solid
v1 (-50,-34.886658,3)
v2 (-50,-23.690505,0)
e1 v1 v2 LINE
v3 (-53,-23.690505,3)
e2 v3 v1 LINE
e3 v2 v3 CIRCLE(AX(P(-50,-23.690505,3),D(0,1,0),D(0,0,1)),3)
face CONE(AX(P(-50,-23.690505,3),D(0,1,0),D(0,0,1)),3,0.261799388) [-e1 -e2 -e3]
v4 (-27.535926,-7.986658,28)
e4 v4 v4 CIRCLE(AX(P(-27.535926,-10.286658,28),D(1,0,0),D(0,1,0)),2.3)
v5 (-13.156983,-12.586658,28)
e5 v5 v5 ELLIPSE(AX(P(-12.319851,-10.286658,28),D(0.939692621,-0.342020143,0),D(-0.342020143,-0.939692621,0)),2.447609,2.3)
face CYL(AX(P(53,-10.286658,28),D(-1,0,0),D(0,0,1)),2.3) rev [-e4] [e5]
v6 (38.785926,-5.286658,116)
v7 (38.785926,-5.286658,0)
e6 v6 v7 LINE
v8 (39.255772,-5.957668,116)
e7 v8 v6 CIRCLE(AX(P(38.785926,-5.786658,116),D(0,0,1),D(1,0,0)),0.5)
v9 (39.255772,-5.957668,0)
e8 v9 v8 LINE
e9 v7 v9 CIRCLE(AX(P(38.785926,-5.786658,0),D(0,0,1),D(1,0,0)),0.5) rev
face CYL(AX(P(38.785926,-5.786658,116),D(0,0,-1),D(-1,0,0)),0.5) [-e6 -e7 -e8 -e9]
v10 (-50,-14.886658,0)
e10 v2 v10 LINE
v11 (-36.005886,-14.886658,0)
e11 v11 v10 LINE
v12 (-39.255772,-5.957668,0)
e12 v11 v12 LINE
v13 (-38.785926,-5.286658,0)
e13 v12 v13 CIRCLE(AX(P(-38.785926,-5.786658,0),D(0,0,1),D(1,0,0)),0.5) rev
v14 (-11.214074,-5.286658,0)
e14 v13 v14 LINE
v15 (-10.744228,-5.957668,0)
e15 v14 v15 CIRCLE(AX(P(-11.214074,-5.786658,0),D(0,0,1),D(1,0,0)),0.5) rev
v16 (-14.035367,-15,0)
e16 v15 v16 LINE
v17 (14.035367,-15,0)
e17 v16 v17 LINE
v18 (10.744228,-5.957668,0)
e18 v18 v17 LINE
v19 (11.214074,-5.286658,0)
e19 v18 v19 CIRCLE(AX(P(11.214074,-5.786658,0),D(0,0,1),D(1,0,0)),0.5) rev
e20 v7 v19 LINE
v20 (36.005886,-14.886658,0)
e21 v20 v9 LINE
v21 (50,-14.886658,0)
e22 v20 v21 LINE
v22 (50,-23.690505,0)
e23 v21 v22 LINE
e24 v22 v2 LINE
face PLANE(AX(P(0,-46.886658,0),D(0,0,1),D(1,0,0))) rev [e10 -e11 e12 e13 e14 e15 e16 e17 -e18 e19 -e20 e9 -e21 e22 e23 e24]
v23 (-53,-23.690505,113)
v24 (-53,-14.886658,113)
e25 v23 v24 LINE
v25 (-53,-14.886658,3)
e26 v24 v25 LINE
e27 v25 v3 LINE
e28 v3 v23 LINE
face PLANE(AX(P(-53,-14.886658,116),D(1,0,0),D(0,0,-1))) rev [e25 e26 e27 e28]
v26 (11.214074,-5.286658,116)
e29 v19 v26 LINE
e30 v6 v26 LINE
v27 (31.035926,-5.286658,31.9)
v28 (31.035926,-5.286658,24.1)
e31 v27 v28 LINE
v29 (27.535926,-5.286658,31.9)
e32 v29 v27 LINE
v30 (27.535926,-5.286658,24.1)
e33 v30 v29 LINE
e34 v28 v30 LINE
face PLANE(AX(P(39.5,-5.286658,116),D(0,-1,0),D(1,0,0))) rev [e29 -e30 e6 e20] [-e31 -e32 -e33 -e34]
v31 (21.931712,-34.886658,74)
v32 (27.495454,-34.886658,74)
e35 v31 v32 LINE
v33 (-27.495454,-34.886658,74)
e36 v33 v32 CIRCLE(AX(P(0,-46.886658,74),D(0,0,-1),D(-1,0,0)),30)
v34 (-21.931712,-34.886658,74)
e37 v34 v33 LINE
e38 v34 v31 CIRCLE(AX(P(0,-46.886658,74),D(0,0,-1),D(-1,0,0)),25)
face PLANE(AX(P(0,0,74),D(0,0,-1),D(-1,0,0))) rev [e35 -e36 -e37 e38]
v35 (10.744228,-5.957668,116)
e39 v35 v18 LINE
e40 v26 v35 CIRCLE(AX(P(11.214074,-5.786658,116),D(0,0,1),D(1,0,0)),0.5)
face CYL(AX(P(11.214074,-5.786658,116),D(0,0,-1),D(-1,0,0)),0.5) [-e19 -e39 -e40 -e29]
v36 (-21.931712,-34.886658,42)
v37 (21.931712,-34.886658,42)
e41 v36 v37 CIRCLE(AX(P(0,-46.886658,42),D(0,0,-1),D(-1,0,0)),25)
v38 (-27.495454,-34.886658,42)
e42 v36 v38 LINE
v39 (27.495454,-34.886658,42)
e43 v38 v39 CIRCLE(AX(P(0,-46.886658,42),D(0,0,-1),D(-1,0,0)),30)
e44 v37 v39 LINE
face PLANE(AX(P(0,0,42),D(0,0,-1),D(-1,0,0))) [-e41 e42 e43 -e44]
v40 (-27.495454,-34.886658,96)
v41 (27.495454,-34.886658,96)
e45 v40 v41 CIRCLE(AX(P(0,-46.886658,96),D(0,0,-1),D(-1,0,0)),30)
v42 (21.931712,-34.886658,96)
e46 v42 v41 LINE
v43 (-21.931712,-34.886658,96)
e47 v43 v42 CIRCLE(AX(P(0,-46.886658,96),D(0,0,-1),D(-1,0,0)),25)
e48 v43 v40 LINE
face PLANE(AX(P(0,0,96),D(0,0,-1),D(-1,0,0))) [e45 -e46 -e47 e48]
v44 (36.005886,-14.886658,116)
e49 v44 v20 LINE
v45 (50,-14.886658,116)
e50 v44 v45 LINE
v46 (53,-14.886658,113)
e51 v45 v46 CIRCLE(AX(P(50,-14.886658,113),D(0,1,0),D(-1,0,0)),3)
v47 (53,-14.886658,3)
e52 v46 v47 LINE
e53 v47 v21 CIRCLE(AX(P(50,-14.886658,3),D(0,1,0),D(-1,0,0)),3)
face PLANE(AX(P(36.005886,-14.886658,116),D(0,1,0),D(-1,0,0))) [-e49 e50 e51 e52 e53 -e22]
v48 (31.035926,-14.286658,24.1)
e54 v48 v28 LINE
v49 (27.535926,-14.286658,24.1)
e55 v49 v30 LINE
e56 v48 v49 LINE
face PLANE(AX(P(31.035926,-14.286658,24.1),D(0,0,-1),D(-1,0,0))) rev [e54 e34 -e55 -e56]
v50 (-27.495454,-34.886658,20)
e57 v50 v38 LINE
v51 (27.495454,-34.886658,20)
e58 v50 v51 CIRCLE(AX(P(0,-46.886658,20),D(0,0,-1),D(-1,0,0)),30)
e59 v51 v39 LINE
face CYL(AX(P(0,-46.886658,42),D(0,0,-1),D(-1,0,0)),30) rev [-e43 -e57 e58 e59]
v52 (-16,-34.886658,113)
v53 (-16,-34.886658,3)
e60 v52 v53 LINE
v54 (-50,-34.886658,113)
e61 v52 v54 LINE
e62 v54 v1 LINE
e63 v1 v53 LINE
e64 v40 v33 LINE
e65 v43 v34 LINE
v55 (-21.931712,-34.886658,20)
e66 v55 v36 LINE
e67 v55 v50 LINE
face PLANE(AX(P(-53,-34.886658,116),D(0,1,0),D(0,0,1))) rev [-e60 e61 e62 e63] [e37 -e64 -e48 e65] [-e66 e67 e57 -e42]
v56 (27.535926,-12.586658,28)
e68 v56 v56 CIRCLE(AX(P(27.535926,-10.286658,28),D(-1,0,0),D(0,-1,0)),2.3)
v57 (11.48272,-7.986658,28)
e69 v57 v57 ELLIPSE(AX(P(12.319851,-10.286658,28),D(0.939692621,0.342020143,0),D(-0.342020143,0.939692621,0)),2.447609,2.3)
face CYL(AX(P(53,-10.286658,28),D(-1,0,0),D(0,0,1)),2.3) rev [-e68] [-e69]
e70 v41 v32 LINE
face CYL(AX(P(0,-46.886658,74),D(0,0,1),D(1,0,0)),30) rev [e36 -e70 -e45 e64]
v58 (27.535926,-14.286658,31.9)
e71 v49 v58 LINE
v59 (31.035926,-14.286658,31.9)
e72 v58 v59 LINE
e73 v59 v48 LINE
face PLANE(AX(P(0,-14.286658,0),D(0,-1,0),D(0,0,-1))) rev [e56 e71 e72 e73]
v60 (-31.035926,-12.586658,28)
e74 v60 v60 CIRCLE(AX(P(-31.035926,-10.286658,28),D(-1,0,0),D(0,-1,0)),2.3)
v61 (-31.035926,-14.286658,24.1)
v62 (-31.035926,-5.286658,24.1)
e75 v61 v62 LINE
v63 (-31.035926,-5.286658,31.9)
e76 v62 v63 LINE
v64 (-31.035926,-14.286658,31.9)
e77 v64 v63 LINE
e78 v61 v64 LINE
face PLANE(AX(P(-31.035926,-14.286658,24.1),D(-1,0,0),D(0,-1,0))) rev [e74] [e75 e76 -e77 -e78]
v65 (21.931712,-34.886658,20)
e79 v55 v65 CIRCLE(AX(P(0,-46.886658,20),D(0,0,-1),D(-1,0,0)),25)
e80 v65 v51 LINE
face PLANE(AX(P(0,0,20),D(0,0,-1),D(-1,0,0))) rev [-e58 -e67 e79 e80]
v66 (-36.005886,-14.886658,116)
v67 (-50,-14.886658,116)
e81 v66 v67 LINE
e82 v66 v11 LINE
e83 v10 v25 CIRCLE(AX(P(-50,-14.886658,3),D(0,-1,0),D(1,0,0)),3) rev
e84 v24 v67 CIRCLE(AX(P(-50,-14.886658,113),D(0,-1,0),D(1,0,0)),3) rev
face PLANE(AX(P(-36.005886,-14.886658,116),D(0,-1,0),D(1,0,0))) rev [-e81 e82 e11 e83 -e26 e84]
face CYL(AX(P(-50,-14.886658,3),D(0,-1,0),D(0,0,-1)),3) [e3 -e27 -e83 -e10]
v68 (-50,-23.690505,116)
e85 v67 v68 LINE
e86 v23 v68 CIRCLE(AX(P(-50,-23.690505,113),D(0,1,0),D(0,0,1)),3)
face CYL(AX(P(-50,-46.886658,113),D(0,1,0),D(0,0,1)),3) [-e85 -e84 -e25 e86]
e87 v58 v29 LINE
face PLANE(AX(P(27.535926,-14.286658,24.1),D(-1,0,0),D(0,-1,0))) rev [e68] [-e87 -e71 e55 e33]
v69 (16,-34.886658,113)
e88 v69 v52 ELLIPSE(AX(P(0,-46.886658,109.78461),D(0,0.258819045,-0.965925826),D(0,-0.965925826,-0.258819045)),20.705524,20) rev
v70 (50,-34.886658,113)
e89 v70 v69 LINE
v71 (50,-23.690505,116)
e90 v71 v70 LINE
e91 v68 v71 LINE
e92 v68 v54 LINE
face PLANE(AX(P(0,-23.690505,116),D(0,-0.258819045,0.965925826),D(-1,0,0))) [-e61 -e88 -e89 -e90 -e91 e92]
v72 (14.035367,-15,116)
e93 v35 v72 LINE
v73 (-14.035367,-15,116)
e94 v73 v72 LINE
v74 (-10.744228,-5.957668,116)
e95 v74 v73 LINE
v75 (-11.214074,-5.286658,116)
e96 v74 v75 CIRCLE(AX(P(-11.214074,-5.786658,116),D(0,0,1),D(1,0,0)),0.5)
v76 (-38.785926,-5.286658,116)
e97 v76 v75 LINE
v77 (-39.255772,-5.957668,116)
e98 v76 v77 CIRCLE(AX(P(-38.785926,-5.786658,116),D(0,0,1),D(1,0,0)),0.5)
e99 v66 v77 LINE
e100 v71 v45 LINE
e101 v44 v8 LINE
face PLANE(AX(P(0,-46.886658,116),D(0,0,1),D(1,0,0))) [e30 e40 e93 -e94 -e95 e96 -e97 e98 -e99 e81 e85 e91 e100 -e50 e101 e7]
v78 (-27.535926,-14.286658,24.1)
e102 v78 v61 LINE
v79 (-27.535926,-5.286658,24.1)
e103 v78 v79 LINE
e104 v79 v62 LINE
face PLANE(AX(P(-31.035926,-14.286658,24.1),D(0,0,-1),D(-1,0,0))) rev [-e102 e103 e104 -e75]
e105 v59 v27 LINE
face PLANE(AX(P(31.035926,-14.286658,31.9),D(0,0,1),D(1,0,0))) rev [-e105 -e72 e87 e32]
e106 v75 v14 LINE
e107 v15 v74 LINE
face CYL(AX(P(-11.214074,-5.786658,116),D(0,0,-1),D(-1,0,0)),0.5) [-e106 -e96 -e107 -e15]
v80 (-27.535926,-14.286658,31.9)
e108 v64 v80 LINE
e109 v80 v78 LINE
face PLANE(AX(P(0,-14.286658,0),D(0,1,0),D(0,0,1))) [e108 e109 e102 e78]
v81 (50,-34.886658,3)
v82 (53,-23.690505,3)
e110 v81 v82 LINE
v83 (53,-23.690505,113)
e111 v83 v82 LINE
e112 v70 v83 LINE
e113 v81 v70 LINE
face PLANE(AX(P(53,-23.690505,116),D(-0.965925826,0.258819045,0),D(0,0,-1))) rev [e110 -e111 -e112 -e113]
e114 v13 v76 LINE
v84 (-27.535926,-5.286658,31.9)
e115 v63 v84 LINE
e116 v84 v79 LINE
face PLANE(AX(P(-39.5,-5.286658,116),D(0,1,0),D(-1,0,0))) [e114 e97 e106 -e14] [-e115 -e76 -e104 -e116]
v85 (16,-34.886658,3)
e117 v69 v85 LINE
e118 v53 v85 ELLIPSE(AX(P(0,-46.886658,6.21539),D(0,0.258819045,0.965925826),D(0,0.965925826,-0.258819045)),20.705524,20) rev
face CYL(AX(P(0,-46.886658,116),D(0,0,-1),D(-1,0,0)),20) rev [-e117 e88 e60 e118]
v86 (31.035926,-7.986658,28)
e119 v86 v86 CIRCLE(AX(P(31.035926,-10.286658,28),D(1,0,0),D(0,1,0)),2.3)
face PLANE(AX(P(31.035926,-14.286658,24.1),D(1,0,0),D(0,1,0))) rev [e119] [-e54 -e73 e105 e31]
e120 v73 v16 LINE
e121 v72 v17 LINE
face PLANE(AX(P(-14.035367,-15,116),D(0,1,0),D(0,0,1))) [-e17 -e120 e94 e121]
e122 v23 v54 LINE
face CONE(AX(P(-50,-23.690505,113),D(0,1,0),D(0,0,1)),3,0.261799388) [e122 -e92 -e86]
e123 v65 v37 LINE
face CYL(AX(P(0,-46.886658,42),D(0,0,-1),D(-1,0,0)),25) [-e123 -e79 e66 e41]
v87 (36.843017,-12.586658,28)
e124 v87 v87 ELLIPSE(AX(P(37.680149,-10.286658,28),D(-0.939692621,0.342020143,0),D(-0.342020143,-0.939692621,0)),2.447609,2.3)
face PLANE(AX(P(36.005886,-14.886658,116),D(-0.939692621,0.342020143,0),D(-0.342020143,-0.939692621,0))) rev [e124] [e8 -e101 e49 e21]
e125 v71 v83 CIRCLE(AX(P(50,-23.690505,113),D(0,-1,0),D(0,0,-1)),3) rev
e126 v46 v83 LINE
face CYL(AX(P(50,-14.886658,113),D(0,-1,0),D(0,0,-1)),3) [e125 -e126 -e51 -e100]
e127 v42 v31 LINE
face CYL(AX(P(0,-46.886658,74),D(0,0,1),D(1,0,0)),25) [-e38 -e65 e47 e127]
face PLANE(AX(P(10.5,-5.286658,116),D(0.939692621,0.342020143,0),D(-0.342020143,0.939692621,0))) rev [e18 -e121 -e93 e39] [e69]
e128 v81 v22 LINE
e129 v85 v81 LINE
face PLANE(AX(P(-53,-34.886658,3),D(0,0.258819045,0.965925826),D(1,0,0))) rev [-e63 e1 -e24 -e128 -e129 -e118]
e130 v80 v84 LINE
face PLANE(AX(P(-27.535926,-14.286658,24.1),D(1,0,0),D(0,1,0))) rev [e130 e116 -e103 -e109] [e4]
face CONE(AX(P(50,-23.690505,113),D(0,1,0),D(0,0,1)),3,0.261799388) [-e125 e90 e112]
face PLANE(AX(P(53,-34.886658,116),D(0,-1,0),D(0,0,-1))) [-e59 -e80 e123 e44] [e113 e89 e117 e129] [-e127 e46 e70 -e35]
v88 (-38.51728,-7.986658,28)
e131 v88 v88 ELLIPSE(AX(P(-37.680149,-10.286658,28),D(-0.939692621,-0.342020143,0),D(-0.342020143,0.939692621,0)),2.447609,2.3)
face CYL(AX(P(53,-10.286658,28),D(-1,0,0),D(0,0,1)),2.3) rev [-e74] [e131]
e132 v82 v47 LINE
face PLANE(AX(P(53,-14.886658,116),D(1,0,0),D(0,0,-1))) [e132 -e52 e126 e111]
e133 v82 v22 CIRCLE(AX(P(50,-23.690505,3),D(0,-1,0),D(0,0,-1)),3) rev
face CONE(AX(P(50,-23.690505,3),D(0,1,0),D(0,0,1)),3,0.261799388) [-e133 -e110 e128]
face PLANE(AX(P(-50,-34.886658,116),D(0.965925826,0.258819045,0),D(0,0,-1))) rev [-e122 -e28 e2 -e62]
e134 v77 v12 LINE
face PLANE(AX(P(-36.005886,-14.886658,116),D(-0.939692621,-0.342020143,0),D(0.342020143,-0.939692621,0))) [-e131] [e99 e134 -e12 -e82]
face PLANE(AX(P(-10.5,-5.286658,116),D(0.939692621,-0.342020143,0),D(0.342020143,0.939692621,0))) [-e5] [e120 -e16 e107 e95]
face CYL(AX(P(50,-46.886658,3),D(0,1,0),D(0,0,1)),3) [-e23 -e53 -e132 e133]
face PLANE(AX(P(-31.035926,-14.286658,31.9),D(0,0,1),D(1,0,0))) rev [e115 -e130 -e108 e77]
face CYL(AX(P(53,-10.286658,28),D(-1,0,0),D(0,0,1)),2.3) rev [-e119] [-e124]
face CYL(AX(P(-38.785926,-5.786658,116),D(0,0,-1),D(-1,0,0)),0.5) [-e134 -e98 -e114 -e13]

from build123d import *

# Parameters (mm, degrees)
BOSS_EXTRUDE1_DEPTH = 116
FILLET1_R           = 3
CHAMFER2_SIZE       = 3
CHAMFER2_SIZE_2     = 11.196152423
FILLET2_R           = 0.5
SKETCH3_W           = 3.5
SKETCH3_H           = 7.8
CUT_EXTRUDE1_DEPTH  = 9
SKETCH4_R           = 2.3
CUT_EXTRUDE2_DEPTH  = 161.962973694
CUT_EXTRUDE3_START  = -20
CUT_EXTRUDE3_DEPTH  = 22
CUT_EXTRUDE4_START  = -74
CUT_EXTRUDE4_DEPTH  = 22


with BuildPart() as part:
    # Sketch2 → Boss-Extrude1 (new body)
    with BuildSketch(Plane.XY):
        with BuildLine():
            Line((-39.5, -5.286657915), (-10.5, -5.286657915))
            Line((-10.5, -5.286657915), (-14.035367394, -15))
            Line((-14.035367394, -15), (14.035367394, -15))
            Line((14.035367394, -15), (10.5, -5.286657915))
            Line((10.5, -5.286657915), (39.5, -5.286657915))
            Line((39.5, -5.286657915), (36.005885751, -14.886657915))
            Line((36.005885751, -14.886657915), (53, -14.886657915))
            Line((53, -14.886657915), (53, -34.886657915))
            Line((53, -34.886657915), (16, -34.886657915))
            ThreePointArc((16, -34.886657915), (0, -26.886657915), (-16, -34.886657915))
            Line((-16, -34.886657915), (-53, -34.886657915))
            Line((-53, -34.886657915), (-53, -14.886657915))
            Line((-53, -14.886657915), (-36.005885751, -14.886657915))
            Line((-36.005885751, -14.886657915), (-39.5, -5.286657915))
        make_face()
    extrude(amount=BOSS_EXTRUDE1_DEPTH)

    # Fillet1
    fillet1_edges = [part.edges().sort_by_distance(p)[0] for p in [
        (-53, -24.886657915, 0),
        (53, -24.886657915, 0),
        (-53, -24.886657915, 116),
        (53, -24.886657915, 116),
    ]]
    fillet(fillet1_edges, radius=FILLET1_R)

    # Chamfer2
    # the kernel refuses this chamfer: 11.196152423, 3 mm, written as the material it takes off along each edge
    with BuildSketch(Plane(origin=(50, -34.886657915, 3), x_dir=(1, 0, 0), z_dir=(0, 0, 1))) as chamfer2_piece_1:
        Polygon((3 - CHAMFER2_SIZE, 0), (3, CHAMFER2_SIZE_2), (3, 0), align=None)
    revolve(axis=Axis((50, -34.886657915, 3), (0, 1, 0)), revolution_arc=90, mode=Mode.SUBTRACT)
    with BuildSketch(Plane(origin=(50, -34.886657915, 116), x_dir=(0, 1, 0), z_dir=(-1, 0, 0))) as chamfer2_piece_2:
        Polygon((CHAMFER2_SIZE_2, 0), (0, CHAMFER2_SIZE), (0, 0), align=None)
    extrude(amount=63.073290499, mode=Mode.SUBTRACT)
    with BuildSketch(Plane(origin=(13.073290499, -34.886657915, 0), x_dir=(0, 0, 1), z_dir=(-1, 0, 0))) as chamfer2_piece_3:
        Polygon((CHAMFER2_SIZE, 0), (0, CHAMFER2_SIZE_2), (0, 0), align=None)
    extrude(amount=63.073290499, mode=Mode.SUBTRACT)
    with BuildSketch(Plane(origin=(-50, -34.886657915, 113), x_dir=(-1, 0, 0), z_dir=(0, 0, -1))) as chamfer2_piece_4:
        Polygon((3 - CHAMFER2_SIZE, 0), (3, CHAMFER2_SIZE_2), (3, 0), align=None)
    revolve(axis=Axis((-50, -34.886657915, 113), (0, 1, 0)), revolution_arc=90, mode=Mode.SUBTRACT)
    with BuildSketch(Plane(origin=(-53, -34.886657915, 3), x_dir=(1, 0, 0), z_dir=(0, 0, 1))) as chamfer2_piece_5:
        Polygon((CHAMFER2_SIZE, 0), (0, CHAMFER2_SIZE_2), (0, 0), align=None)
    extrude(amount=110, mode=Mode.SUBTRACT)
    with BuildSketch(Plane(origin=(-50, -34.886657915, 3), x_dir=(-1, 0, 0), z_dir=(0, 0, 1))) as chamfer2_piece_6:
        Polygon((3 - CHAMFER2_SIZE, 0), (3, -CHAMFER2_SIZE_2), (3, 0), align=None)
    revolve(axis=Axis((-50, -34.886657915, 3), (0, -1, 0)), revolution_arc=90, mode=Mode.SUBTRACT)
    with BuildSketch(Plane(origin=(13.073290499, -34.886657915, 116), x_dir=(0, 0, -1), z_dir=(-1, 0, 0))) as chamfer2_piece_7:
        Polygon((CHAMFER2_SIZE, 0), (0, -CHAMFER2_SIZE_2), (0, 0), align=None)
    extrude(amount=63.073290499, mode=Mode.SUBTRACT)
    with BuildSketch(Plane(origin=(50, -34.886657915, 113), x_dir=(1, 0, 0), z_dir=(0, 0, -1))) as chamfer2_piece_8:
        Polygon((3 - CHAMFER2_SIZE, 0), (3, -CHAMFER2_SIZE_2), (3, 0), align=None)
    revolve(axis=Axis((50, -34.886657915, 113), (0, -1, 0)), revolution_arc=90, mode=Mode.SUBTRACT)
    with BuildSketch(Plane(origin=(53, -34.886657915, 3), x_dir=(-1, 0, 0), z_dir=(0, 0, 1))) as chamfer2_piece_9:
        Polygon((CHAMFER2_SIZE, 0), (0, -CHAMFER2_SIZE_2), (0, 0), align=None)
    extrude(amount=110, mode=Mode.SUBTRACT)
    with BuildSketch(Plane(origin=(50, -34.886657915, 0), x_dir=(0, 1, 0), z_dir=(-1, 0, 0))) as chamfer2_piece_10:
        Polygon((CHAMFER2_SIZE_2, 0), (0, -CHAMFER2_SIZE), (0, 0), align=None)
    extrude(amount=63.073290499, mode=Mode.SUBTRACT)

    # Fillet2
    fillet2_edges = [part.edges().sort_by_distance(p)[0] for p in [
        (39.5, -5.286657915, 58),
        (10.5, -5.286657915, 58),
        (-10.5, -5.286657915, 58),
        (-39.5, -5.286657915, 58),
    ]]
    fillet(fillet2_edges, radius=FILLET2_R)

    # Sketch3 → Cut-Extrude1 (cut)
    with BuildSketch(Plane(origin=(0, -5.286657915, 0), x_dir=(1, 0, 0), z_dir=(0, 1, 0))):
        with Locations((-29.285925997, -28)):
            Rectangle(SKETCH3_W, SKETCH3_H)
        with Locations((29.285925997, -28)):
            Rectangle(SKETCH3_W, SKETCH3_H)
    extrude(amount=-CUT_EXTRUDE1_DEPTH, mode=Mode.SUBTRACT)

    # Sketch4 → Cut-Extrude2 (cut, through all)
    with BuildSketch(Plane.ZY.offset(53)):
        with Locations(Location((28, -10.286657915, 0), (0, 0, 270))):
            Circle(SKETCH4_R)
    extrude(amount=-CUT_EXTRUDE2_DEPTH, mode=Mode.SUBTRACT)

    # Sketch5 → Cut-Extrude3 (cut)
    with BuildSketch(Plane(origin=(0, 0, 0), x_dir=(-1, 0, 0), z_dir=(0, 0, -1)).offset(CUT_EXTRUDE3_START)):
        with BuildLine():
            ThreePointArc((9.324082409, -23.690505492), (20.713547019, -32.888480537), (25, -46.886657915))
            ThreePointArc((25, -46.886657915), (-13.998177377, -67.600204934), (-9.324082409, -23.690505492))
            Line((-9.324082409, -23.690505492), (-19.024681673, -23.690505492))
            ThreePointArc((-19.024681673, -23.690505492), (-12.830813493, -74.004368458), (30, -46.886657915))
            ThreePointArc((30, -46.886657915), (27.117710543, -34.055844421), (19.024681673, -23.690505492))
            Line((19.024681673, -23.690505492), (9.324082409, -23.690505492))
        make_face()
        with BuildLine():
            ThreePointArc((-9.324082409, -23.690505492), (0, -21.886657915), (9.324082409, -23.690505492))
            Line((9.324082409, -23.690505492), (19.024681673, -23.690505492))
            ThreePointArc((19.024681673, -23.690505492), (0, -16.886657915), (-19.024681673, -23.690505492))
            Line((-19.024681673, -23.690505492), (-9.324082409, -23.690505492))
        make_face()
    extrude(amount=-CUT_EXTRUDE3_DEPTH, mode=Mode.SUBTRACT)

    # Sketch5<3> → Cut-Extrude4 (cut)
    with BuildSketch(Plane(origin=(0, 0, 0), x_dir=(-1, 0, 0), z_dir=(0, 0, -1)).offset(CUT_EXTRUDE4_START)):
        with BuildLine():
            ThreePointArc((9.324082409, -23.690505492), (20.713547019, -32.888480537), (25, -46.886657915))
            ThreePointArc((25, -46.886657915), (-13.998177377, -67.600204934), (-9.324082409, -23.690505492))
            Line((-9.324082409, -23.690505492), (-19.024681673, -23.690505492))
            ThreePointArc((-19.024681673, -23.690505492), (-12.830813493, -74.004368458), (30, -46.886657915))
            ThreePointArc((30, -46.886657915), (27.117710543, -34.055844421), (19.024681673, -23.690505492))
            Line((19.024681673, -23.690505492), (9.324082409, -23.690505492))
        make_face()
        with BuildLine():
            ThreePointArc((-9.324082409, -23.690505492), (0, -21.886657915), (9.324082409, -23.690505492))
            Line((9.324082409, -23.690505492), (19.024681673, -23.690505492))
            ThreePointArc((19.024681673, -23.690505492), (0, -16.886657915), (-19.024681673, -23.690505492))
            Line((-19.024681673, -23.690505492), (-9.324082409, -23.690505492))
        make_face()
    extrude(amount=-CUT_EXTRUDE4_DEPTH, mode=Mode.SUBTRACT)


solid = part.part
